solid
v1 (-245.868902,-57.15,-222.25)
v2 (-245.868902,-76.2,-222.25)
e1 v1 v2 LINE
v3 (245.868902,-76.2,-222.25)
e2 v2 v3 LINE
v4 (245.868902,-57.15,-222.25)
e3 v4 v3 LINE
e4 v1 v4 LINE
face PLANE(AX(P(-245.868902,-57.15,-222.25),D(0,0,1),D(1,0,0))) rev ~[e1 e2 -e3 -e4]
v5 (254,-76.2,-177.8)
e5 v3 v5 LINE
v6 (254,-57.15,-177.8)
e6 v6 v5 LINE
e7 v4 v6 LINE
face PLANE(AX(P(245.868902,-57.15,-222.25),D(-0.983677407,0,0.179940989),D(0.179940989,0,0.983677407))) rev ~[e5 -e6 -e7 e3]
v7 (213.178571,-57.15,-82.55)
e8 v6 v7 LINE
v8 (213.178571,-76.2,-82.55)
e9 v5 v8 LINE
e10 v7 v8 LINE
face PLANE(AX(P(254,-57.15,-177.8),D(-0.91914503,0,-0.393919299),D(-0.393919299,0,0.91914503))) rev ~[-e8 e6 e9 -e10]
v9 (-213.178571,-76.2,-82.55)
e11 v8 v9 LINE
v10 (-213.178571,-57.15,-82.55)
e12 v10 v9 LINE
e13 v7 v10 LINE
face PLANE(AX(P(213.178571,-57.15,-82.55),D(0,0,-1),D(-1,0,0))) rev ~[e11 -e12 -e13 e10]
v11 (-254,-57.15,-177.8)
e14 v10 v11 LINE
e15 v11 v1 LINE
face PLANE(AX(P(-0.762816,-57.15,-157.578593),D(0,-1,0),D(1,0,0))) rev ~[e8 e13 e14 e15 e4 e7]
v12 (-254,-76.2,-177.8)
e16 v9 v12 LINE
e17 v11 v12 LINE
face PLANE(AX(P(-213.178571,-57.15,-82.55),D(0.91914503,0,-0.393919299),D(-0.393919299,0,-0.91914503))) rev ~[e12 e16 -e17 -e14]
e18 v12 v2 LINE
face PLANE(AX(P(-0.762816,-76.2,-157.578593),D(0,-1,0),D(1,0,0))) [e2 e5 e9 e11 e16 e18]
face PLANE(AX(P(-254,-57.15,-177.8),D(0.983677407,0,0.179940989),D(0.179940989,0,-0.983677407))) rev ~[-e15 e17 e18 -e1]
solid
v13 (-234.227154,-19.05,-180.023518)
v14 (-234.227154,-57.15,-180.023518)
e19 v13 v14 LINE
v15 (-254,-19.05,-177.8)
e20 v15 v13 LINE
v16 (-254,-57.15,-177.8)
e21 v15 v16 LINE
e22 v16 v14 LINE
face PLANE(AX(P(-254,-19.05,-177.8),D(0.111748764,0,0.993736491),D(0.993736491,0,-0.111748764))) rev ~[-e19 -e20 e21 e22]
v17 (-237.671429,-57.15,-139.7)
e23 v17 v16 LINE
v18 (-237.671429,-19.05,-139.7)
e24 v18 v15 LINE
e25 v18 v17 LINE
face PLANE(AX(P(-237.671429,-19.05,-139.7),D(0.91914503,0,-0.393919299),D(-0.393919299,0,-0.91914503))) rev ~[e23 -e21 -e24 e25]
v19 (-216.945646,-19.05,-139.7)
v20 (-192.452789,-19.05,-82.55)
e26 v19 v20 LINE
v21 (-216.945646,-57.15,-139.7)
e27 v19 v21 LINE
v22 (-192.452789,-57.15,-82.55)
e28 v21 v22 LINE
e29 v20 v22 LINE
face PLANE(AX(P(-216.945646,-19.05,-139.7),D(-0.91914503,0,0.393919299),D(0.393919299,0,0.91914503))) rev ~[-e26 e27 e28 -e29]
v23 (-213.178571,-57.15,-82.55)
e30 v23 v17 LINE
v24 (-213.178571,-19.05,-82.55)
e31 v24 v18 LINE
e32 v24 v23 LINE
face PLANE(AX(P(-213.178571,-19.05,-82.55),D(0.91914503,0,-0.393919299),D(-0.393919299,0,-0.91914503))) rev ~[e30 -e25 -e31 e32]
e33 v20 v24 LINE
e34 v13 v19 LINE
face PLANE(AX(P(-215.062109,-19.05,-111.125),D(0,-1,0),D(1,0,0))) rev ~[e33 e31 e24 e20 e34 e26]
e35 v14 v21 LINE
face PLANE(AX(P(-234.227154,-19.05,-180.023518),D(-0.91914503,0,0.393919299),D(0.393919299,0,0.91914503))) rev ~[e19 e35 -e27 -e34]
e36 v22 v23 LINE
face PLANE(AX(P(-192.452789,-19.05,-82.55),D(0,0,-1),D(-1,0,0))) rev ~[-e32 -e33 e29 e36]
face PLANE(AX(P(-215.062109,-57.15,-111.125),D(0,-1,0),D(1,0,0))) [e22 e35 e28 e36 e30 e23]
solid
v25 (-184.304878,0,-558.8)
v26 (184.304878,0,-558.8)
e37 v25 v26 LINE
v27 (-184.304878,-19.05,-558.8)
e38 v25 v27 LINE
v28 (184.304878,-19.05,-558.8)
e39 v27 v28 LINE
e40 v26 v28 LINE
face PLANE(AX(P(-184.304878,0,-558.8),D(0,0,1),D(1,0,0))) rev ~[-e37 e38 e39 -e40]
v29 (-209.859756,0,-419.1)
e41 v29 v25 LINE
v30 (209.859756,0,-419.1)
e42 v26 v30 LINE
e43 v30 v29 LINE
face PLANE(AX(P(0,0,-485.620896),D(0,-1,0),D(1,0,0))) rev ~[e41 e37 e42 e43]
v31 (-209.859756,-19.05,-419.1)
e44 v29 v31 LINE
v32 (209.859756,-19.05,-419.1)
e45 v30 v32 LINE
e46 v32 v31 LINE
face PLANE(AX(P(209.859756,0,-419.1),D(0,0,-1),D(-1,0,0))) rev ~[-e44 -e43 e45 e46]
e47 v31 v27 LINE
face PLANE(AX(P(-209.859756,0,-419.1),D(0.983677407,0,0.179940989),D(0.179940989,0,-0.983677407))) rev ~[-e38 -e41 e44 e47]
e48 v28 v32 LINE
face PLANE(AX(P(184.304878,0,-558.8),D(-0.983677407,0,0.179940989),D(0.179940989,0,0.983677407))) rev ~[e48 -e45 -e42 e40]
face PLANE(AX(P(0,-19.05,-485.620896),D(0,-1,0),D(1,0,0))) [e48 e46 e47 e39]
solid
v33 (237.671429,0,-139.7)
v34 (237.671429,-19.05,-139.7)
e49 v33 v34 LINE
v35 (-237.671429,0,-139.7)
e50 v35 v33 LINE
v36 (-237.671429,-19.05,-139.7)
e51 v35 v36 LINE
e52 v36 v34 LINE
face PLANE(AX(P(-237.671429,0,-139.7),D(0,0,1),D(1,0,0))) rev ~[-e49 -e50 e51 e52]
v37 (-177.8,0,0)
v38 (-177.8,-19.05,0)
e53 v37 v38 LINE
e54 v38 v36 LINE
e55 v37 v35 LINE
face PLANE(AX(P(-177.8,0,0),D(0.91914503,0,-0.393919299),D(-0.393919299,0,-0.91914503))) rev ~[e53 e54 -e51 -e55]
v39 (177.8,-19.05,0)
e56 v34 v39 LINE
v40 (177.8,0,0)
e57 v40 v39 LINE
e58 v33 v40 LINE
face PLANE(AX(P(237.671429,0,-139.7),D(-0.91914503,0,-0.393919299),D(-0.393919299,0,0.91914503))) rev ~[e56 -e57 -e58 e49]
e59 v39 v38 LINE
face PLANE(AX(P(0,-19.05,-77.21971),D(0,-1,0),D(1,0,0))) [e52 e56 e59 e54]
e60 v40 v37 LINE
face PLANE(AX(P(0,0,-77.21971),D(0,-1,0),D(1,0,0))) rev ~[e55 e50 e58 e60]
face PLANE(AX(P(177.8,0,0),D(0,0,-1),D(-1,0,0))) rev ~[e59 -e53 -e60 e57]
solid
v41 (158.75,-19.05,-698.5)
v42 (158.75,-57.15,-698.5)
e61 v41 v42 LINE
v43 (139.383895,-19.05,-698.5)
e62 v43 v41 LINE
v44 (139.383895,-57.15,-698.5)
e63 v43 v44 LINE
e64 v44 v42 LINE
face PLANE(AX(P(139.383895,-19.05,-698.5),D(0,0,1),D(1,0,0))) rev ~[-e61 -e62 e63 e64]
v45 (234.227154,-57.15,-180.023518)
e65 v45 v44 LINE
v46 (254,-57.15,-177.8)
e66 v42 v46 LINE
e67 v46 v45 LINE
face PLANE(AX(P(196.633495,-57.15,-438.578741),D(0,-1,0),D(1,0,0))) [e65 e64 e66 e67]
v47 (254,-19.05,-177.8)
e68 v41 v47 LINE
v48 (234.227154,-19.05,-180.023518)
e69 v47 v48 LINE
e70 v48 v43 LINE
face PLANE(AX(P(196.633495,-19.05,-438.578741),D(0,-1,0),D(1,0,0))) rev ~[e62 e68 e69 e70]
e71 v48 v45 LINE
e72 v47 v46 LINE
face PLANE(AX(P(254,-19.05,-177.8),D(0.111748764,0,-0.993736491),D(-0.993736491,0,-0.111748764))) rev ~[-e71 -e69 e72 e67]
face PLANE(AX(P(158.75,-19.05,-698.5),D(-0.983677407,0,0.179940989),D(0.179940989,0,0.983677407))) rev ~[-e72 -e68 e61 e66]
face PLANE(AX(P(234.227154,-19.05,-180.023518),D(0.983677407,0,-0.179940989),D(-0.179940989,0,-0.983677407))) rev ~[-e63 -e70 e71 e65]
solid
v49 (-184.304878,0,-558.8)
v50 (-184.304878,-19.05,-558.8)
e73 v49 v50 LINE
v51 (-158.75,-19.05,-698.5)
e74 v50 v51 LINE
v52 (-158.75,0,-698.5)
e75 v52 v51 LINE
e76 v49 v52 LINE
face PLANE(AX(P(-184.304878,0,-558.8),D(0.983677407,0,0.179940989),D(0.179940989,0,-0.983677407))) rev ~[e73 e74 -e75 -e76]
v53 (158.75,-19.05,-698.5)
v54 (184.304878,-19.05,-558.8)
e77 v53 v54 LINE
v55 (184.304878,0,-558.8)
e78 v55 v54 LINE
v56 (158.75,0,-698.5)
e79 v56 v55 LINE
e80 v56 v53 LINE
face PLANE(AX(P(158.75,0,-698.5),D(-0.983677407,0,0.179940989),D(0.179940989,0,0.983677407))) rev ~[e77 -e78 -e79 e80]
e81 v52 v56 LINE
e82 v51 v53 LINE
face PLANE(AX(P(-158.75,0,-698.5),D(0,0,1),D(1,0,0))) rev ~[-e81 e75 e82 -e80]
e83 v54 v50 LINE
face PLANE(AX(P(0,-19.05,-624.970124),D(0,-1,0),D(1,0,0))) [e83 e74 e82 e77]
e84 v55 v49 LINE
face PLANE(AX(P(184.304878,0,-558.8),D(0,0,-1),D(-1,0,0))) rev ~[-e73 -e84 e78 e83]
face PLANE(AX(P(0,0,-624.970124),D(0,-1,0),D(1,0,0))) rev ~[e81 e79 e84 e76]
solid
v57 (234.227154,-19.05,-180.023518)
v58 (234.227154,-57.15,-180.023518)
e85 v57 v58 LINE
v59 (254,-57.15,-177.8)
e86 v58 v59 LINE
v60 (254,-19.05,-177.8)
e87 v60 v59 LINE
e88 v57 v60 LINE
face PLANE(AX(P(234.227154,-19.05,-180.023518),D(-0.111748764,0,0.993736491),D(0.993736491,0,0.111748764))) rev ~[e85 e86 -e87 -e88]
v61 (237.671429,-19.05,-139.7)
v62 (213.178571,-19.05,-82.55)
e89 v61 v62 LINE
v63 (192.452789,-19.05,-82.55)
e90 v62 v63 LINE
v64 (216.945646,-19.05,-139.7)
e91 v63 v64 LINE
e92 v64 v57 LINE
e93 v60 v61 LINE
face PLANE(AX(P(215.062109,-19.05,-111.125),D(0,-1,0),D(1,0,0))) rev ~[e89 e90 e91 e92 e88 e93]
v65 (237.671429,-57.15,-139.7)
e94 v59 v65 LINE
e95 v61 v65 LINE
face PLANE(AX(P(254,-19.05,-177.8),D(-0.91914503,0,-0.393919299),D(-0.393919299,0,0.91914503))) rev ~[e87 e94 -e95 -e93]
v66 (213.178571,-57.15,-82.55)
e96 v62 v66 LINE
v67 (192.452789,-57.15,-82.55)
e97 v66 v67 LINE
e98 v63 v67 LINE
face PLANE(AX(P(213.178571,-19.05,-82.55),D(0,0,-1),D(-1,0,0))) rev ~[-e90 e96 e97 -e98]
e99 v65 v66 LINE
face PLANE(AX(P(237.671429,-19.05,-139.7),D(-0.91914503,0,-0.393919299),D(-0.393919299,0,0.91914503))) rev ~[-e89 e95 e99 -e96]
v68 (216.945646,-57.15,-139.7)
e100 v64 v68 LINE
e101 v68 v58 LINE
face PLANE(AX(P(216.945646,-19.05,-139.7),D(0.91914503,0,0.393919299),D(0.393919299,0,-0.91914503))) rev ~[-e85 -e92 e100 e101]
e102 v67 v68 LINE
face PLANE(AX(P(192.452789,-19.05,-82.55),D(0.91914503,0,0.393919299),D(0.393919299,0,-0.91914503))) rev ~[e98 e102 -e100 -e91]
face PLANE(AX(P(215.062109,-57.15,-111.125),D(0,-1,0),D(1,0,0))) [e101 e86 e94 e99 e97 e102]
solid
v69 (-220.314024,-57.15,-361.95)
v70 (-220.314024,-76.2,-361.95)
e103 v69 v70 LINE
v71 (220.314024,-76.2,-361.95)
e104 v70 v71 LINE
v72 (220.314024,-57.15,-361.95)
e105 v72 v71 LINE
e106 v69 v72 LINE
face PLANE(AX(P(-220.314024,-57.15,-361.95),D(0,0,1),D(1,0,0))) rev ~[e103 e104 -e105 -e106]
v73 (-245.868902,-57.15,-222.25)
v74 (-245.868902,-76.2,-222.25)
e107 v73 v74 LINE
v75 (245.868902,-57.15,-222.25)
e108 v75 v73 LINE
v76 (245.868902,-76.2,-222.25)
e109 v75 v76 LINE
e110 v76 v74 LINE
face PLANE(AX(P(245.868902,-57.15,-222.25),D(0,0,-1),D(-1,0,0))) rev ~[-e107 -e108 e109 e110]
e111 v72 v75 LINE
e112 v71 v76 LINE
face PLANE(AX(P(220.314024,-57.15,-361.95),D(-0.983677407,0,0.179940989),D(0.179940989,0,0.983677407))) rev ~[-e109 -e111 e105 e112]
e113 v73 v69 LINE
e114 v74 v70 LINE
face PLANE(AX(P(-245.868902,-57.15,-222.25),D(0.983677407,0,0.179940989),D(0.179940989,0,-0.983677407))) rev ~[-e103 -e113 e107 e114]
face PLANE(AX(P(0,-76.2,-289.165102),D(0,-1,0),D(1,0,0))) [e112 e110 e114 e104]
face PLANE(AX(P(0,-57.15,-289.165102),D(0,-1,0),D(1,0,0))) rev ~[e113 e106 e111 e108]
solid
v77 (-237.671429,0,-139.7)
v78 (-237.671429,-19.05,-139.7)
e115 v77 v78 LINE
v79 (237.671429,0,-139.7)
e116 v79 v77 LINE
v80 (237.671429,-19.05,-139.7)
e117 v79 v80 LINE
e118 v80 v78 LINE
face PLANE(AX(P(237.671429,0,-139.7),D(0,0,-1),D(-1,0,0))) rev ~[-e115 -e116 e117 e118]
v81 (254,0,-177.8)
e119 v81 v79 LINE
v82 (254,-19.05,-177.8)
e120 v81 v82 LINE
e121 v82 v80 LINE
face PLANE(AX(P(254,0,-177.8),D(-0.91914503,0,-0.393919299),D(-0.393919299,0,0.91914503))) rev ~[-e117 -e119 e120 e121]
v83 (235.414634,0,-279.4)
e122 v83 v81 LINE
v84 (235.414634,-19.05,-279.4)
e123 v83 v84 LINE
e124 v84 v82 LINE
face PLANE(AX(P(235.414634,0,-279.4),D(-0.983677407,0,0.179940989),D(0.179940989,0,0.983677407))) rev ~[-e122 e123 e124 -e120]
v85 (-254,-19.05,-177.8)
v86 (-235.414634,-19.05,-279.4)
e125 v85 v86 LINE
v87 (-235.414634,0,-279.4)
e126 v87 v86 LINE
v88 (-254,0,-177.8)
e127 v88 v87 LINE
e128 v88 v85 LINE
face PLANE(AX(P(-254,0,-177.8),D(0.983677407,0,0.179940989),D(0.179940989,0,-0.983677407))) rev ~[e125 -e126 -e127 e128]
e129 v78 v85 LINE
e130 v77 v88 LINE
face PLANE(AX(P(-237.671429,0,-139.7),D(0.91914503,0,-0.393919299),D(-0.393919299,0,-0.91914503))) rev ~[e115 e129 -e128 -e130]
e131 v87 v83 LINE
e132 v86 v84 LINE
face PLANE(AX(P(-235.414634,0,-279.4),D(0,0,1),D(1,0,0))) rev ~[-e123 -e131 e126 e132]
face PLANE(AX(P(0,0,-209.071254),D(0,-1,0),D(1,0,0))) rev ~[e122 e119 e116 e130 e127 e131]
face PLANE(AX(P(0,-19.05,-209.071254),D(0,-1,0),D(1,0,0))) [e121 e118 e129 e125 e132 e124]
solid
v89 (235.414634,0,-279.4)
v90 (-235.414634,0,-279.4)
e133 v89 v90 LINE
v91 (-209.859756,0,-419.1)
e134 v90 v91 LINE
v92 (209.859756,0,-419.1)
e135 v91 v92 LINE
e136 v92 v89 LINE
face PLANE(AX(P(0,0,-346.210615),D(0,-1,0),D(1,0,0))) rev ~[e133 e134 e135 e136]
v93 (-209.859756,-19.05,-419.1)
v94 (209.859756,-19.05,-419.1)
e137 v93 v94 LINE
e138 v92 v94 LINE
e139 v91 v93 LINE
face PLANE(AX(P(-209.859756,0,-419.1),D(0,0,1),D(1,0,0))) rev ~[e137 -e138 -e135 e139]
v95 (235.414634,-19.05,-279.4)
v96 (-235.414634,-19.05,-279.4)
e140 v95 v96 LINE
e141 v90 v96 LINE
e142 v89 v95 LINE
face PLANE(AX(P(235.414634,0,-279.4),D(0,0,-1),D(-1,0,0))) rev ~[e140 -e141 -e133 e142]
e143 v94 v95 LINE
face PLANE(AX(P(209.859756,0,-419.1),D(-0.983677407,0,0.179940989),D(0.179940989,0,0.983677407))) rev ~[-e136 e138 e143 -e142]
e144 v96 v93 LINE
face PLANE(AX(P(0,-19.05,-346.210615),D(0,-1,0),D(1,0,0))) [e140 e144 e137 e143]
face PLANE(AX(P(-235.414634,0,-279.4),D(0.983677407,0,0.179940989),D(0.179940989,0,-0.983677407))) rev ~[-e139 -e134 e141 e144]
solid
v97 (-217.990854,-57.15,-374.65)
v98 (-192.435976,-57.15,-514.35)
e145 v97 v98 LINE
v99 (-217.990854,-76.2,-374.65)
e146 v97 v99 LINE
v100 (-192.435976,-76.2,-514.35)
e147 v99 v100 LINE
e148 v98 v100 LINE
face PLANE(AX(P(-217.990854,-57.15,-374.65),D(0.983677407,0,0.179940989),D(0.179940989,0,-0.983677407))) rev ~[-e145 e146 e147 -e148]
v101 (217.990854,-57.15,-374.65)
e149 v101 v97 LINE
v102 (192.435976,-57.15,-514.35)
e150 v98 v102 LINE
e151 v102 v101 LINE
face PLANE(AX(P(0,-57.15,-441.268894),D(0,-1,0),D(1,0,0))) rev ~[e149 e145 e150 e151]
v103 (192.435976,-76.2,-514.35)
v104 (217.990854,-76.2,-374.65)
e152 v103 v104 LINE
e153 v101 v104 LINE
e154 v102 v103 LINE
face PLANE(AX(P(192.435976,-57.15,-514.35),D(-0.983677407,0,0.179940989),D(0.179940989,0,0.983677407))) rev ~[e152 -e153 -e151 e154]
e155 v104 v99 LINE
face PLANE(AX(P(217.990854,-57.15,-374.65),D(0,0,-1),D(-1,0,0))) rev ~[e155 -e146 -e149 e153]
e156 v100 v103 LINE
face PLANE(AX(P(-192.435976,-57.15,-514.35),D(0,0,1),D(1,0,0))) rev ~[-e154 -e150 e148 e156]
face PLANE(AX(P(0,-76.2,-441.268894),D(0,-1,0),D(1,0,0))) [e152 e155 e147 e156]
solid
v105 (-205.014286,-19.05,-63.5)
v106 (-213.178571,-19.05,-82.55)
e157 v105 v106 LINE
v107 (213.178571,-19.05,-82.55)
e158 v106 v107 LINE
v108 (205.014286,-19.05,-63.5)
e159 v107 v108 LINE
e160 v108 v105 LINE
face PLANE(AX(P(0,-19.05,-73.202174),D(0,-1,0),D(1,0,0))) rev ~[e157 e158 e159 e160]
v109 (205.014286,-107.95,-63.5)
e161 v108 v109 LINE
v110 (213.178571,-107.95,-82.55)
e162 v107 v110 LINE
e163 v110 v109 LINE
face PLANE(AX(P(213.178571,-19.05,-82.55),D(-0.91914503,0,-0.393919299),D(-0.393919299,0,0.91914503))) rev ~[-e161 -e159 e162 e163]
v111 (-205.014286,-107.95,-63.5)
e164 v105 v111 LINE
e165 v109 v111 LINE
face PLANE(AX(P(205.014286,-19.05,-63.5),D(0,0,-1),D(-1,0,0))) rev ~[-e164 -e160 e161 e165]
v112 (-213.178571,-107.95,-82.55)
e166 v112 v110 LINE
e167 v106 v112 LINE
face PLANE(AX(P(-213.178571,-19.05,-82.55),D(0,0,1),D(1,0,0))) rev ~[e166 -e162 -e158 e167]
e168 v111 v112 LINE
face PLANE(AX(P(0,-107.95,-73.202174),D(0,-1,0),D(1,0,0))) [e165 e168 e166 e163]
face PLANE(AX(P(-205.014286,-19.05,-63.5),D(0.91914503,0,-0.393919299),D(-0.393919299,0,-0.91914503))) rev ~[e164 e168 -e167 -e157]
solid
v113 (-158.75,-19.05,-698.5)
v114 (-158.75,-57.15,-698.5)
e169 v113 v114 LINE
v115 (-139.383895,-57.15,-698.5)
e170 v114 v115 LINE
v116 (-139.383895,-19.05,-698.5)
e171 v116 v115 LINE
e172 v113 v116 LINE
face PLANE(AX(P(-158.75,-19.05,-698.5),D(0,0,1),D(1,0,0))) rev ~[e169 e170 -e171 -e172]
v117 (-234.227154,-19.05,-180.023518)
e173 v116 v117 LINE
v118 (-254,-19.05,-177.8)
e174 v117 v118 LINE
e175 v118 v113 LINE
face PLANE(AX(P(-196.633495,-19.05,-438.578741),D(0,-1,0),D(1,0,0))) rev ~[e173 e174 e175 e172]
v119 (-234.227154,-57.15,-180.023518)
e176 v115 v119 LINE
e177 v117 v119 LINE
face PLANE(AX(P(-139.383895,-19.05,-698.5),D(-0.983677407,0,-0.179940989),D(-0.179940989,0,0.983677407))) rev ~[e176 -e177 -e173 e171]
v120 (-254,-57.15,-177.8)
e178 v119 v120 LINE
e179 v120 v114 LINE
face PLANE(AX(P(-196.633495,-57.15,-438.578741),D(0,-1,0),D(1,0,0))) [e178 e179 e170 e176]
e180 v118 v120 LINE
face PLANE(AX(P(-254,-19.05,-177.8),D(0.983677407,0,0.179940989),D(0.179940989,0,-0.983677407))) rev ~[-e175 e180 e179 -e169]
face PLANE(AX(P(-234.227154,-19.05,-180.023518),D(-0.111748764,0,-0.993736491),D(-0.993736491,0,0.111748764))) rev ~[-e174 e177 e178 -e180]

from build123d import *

# Parameters (mm, degrees)
F2_DEPTH  = 19.05
F3_DEPTH  = 19.05
F5_DEPTH  = 38.1
F6_DEPTH  = 38.1
F7_DEPTH  = 88.9
F9_DEPTH  = 19.05
F10_DEPTH = 19.05


# Not quite as in the source:
# - a feature names something its author has since deleted; it is built from what else it names


with BuildPart() as f2:
    # F1 (on Front) → F2 (new body)
    with BuildSketch(Plane.XZ):
        Polygon((-209.8597560976, -419.1), (-184.3048780488, -558.8), (184.3048780488, -558.8), (209.8597560976, -419.1), align=None)
    extrude(amount=F2_DEPTH)


with BuildPart() as f2b:
    # F1 (on Front) → F2, piece 2 (new body)
    with BuildSketch(Plane.XZ):
        Polygon((-254, -177.8), (-235.4146341463, -279.4), (235.4146341463, -279.4), (254, -177.8), (237.6714285714, -139.7), (-237.6714285714, -139.7), align=None)
    extrude(amount=F2_DEPTH)


with BuildPart() as f3:
    # F1 (on Front) → F3 (new body)
    with BuildSketch(Plane.XZ):
        Polygon((-184.3048780488, -558.8), (-158.75, -698.5), (158.75, -698.5), (184.3048780488, -558.8), align=None)
    extrude(amount=F3_DEPTH)


with BuildPart() as f3b:
    # F1 (on Front) → F3, piece 2 (new body)
    with BuildSketch(Plane.XZ):
        Polygon((-235.4146341463, -279.4), (-209.8597560976, -419.1), (209.8597560976, -419.1), (235.4146341463, -279.4), align=None)
    extrude(amount=F3_DEPTH)


with BuildPart() as f3c:
    # F1 (on Front) → F3, piece 3 (new body)
    with BuildSketch(Plane.XZ):
        Polygon((-177.8, 0), (-237.6714285714, -139.7), (237.6714285714, -139.7), (177.8, 0), align=None)
    extrude(amount=F3_DEPTH)


with BuildPart() as f5:
    # F4 (on face) → F5 (new body)
    with BuildSketch(Plane.XZ.offset(19.05)):
        Polygon((-213.1785714286, -82.55), (-237.6714285714, -139.7), (-216.9456460476, -139.7), (-192.4527889048, -82.55), align=None)
        Polygon((-237.6714285714, -139.7), (-254, -177.8), (-234.2271538208, -180.0235181374), (-216.9456460476, -139.7), align=None)
    extrude(amount=F5_DEPTH)


with BuildPart() as f5b:
    # F4 (on face) → F5, piece 2 (new body)
    with BuildSketch(Plane.XZ.offset(19.05)):
        Polygon((192.4527889048, -82.55), (216.9456460476, -139.7), (237.6714285714, -139.7), (213.1785714286, -82.55), align=None)
        Polygon((237.6714285714, -139.7), (216.9456460476, -139.7), (234.2271538208, -180.0235181374), (254, -177.8), align=None)
    extrude(amount=F5_DEPTH)


with BuildPart() as f6:
    # F4 (on face) → F6 (new body)
    with BuildSketch(Plane.XZ.offset(19.05)):
        Polygon((-254, -177.8), (-158.75, -698.5), (-139.3838949435, -698.5), (-234.2271538208, -180.0235181374), align=None)
    extrude(amount=F6_DEPTH)


with BuildPart() as f6b:
    # F4 (on face) → F6, piece 2 (new body)
    with BuildSketch(Plane.XZ.offset(19.05)):
        Polygon((254, -177.8), (234.2271538208, -180.0235181374), (139.3838949435, -698.5), (158.75, -698.5), align=None)
    extrude(amount=F6_DEPTH)


with BuildPart() as f7:
    # F4 (on face) → F7 (new body)
    with BuildSketch(Plane.XZ.offset(19.05)):
        Polygon((-205.0142857143, -63.5), (-213.1785714286, -82.55), (-192.4527889048, -82.55), (192.4527889048, -82.55), (213.1785714286, -82.55), (205.0142857143, -63.5), align=None)
    extrude(amount=F7_DEPTH)


with BuildPart() as f9:
    # F8 (on face) → F9 (new body)
    with BuildSketch(Plane.XZ.offset(57.15)):
        Polygon((192.4527889048, -82.55), (-213.1785714286, -82.55), (-254, -177.8), (-245.868902439, -222.25), (245.868902439, -222.25), (254, -177.8), (234.2271538208, -180.0235181374), align=None)
        Polygon((213.1785714286, -82.55), (192.4527889048, -82.55), (234.2271538208, -180.0235181374), (254, -177.8), align=None)
    extrude(amount=F9_DEPTH)


with BuildPart() as f9b:
    # F8 (on face) → F9, piece 2 (new body)
    with BuildSketch(Plane.XZ.offset(57.15)):
        Polygon((217.9908536585, -374.65), (-217.9908536585, -374.65), (-192.4359756098, -514.35), (192.4359756098, -514.35), align=None)
    extrude(amount=F9_DEPTH)


with BuildPart() as f10:
    # F8 (on face) → F10 (new body)
    with BuildSketch(Plane.XZ.offset(57.15)):
        Polygon((245.868902439, -222.25), (-245.868902439, -222.25), (-220.3140243902, -361.95), (220.3140243902, -361.95), align=None)
    extrude(amount=F10_DEPTH)


solid = Compound([f2.part, f2b.part, f3.part, f3b.part, f3c.part, f5.part, f5b.part, f6.part, f6b.part, f7.part, f9.part, f9b.part, f10.part])
